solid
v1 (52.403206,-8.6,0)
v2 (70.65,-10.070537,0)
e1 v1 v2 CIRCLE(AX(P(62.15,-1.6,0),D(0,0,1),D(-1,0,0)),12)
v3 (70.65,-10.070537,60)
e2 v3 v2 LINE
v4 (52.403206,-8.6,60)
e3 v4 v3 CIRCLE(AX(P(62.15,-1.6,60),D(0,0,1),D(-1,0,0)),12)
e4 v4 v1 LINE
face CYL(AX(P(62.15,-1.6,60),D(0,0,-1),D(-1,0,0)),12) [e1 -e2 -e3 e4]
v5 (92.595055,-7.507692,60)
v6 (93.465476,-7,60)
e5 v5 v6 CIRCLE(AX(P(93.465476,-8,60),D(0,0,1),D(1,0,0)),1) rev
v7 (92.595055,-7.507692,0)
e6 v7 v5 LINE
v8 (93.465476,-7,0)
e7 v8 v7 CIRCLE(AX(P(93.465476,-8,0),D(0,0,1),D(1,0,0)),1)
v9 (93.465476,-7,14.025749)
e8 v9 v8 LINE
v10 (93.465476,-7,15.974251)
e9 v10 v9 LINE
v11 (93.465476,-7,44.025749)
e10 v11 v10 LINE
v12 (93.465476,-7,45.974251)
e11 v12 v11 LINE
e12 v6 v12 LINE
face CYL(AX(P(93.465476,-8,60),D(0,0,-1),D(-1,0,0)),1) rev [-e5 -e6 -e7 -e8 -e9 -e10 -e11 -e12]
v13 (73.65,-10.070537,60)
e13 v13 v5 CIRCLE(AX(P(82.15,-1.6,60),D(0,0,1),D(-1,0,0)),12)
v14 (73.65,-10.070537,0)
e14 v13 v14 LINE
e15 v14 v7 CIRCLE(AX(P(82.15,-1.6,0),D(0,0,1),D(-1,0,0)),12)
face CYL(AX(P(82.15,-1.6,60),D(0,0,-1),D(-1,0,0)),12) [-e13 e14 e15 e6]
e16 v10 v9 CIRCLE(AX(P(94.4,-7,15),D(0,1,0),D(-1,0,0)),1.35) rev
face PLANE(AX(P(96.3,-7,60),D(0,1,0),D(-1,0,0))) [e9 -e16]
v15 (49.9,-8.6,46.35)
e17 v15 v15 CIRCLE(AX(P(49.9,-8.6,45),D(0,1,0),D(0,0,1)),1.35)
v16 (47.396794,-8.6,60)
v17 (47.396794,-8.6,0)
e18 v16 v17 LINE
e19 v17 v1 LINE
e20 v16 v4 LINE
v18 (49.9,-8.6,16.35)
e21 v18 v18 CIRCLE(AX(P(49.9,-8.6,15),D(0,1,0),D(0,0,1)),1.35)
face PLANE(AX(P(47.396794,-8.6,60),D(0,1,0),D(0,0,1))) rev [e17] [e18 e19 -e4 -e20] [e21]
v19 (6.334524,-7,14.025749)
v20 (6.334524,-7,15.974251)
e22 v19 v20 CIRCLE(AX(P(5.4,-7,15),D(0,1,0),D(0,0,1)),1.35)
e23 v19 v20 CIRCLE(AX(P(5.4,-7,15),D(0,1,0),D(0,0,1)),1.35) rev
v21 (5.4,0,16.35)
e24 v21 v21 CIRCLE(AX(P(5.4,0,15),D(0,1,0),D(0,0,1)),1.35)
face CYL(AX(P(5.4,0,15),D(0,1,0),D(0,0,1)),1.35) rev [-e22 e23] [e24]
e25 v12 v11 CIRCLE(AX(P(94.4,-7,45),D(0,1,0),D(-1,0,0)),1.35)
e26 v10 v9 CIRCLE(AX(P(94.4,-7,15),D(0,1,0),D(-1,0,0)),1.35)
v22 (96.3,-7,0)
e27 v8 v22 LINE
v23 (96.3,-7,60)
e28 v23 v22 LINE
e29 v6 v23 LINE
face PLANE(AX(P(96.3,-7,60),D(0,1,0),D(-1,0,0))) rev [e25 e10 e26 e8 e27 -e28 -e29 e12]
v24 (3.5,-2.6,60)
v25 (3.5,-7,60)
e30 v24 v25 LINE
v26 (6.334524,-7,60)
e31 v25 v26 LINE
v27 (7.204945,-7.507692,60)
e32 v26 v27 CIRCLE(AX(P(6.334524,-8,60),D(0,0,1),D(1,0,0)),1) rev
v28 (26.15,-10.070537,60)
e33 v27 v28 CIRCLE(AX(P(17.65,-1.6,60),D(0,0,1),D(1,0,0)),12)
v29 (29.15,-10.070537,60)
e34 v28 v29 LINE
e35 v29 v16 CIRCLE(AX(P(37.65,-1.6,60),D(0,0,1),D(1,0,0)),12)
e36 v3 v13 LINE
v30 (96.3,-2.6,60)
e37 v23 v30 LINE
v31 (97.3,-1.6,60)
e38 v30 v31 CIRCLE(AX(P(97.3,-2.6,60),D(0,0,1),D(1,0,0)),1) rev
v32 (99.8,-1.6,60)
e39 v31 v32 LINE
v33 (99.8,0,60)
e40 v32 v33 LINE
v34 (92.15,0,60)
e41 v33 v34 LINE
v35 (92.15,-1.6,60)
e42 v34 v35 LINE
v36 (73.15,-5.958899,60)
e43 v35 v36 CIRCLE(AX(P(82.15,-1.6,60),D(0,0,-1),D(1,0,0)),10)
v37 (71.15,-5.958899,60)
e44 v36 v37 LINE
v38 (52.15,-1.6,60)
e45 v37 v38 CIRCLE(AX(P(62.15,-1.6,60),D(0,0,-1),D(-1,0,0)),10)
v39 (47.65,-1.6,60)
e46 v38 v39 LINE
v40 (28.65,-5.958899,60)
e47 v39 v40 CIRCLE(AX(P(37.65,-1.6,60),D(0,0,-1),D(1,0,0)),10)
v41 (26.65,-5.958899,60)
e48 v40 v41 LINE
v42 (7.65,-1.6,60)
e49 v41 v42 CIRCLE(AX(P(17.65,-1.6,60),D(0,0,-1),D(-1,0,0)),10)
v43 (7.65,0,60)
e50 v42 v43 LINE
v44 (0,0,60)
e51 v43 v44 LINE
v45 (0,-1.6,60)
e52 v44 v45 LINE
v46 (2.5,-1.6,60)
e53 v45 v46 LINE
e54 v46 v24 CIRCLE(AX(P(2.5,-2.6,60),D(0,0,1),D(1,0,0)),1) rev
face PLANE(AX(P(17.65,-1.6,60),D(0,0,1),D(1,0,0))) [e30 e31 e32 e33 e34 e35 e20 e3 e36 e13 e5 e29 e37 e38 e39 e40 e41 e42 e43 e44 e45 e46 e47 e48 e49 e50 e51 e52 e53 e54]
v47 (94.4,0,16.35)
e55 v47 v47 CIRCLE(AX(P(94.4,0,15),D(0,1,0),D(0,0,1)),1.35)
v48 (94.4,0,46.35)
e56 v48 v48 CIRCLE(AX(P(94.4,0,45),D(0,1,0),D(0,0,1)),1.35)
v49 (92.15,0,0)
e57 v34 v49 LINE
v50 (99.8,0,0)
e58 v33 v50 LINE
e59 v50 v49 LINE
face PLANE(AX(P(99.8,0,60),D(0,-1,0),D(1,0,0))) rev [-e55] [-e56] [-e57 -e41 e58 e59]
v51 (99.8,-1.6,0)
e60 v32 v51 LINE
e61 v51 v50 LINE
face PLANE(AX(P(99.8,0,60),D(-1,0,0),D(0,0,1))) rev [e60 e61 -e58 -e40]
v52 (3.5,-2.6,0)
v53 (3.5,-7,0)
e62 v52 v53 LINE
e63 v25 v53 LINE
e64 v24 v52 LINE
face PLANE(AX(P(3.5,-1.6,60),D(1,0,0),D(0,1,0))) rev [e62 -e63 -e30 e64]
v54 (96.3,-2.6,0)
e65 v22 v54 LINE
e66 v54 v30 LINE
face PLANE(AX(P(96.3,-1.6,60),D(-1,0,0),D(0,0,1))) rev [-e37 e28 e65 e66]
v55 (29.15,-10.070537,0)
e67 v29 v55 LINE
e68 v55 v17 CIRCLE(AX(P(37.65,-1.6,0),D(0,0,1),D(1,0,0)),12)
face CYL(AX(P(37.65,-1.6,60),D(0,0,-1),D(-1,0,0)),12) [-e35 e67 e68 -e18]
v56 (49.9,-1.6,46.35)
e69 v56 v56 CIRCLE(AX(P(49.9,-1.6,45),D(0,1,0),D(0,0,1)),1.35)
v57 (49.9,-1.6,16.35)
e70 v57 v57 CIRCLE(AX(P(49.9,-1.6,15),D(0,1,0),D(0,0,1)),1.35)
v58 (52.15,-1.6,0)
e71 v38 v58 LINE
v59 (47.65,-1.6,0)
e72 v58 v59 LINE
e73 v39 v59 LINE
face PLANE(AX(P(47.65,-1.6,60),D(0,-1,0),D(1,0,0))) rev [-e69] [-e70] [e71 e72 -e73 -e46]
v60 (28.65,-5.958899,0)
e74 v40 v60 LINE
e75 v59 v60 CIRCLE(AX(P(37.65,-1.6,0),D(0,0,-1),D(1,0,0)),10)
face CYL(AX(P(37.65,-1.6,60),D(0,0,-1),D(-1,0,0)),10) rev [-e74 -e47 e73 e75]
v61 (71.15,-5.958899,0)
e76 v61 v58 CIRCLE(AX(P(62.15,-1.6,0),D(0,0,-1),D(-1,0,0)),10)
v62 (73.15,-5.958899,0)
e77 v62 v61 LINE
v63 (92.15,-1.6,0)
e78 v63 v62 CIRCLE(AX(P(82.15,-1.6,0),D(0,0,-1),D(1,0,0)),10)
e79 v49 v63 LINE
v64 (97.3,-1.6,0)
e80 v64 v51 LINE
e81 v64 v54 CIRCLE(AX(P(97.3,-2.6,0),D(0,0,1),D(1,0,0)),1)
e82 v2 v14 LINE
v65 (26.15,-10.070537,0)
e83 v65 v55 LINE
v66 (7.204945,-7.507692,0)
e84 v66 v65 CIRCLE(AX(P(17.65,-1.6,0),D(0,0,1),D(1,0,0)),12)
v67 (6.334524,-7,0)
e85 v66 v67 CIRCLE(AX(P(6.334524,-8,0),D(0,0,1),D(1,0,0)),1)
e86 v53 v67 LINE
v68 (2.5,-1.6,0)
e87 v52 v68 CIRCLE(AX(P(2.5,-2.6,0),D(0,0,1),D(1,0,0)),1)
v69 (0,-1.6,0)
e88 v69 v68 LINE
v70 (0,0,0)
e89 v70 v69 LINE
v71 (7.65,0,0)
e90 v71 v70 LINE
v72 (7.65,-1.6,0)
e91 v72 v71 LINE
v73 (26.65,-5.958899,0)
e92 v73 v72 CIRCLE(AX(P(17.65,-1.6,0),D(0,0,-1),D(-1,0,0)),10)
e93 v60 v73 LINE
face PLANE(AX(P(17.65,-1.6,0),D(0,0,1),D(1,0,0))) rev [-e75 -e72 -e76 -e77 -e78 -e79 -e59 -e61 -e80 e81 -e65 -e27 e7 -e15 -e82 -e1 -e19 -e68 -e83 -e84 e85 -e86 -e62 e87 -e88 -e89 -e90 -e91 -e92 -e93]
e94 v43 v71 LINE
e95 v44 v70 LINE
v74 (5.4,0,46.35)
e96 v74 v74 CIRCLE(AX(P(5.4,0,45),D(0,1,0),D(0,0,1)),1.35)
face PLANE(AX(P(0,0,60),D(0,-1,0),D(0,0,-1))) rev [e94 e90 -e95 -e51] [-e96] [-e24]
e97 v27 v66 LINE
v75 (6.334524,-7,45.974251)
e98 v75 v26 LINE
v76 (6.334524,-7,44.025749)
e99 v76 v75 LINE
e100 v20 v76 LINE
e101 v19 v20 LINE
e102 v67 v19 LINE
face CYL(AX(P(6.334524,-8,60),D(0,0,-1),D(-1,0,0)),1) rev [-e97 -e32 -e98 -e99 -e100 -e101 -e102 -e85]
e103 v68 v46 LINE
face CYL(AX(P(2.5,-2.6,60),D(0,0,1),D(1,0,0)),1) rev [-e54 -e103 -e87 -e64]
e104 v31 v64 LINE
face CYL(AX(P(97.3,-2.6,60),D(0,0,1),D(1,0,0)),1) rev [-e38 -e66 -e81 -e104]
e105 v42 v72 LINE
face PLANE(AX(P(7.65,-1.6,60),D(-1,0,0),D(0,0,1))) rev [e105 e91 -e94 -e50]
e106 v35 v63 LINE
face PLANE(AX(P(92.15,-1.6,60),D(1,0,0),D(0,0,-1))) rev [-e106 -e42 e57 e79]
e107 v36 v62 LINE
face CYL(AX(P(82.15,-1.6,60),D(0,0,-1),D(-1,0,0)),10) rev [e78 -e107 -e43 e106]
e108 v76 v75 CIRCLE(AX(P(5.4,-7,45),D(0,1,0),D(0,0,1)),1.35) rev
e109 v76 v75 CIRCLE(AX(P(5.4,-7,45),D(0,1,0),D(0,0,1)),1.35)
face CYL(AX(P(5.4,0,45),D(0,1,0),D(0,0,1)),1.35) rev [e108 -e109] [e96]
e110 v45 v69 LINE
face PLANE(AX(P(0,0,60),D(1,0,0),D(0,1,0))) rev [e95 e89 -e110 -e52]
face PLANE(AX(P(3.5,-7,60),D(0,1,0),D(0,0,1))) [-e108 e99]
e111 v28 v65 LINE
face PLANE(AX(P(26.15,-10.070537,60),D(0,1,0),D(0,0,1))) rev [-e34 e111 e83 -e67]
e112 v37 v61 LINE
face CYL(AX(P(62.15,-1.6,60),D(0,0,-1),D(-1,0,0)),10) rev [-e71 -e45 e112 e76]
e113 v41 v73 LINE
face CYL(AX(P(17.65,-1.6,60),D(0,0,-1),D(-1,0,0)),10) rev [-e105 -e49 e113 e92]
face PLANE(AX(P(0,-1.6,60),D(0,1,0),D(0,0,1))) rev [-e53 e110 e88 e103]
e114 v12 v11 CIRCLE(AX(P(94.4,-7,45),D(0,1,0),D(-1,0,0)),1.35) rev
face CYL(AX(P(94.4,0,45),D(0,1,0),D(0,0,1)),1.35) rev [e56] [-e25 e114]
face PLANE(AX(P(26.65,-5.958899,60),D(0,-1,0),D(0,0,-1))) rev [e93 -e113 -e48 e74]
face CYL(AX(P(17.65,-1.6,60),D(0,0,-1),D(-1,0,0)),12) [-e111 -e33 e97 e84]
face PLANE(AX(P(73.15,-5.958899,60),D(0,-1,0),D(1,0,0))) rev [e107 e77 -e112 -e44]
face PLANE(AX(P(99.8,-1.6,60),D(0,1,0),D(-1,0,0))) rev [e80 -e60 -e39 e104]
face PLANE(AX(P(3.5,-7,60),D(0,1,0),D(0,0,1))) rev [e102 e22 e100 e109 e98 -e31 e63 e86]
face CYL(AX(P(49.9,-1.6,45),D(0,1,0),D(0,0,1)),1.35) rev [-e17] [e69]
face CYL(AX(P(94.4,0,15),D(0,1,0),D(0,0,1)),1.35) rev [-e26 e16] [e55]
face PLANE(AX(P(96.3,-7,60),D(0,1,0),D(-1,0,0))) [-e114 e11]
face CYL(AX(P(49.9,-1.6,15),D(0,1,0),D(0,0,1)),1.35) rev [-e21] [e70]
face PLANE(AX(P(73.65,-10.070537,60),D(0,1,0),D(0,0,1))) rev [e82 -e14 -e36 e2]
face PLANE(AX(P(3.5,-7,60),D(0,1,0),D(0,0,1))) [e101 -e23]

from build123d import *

# Parameters (mm, degrees)
BOSS_EXTRUDE1_DEPTH                  = 60
FILLET1_R                            = 1
F_2_7_START                          = -7
F_2_7_2_7_DIAMETER_HOLE1_OUTLINE_R   = 1.35
F_2_7_2_7_DIAMETER_HOLE1_DEPTH       = 7
F_2_7_START_2                        = -8.6
F_2_7_2_7_DIAMETER_HOLE1_2_OUTLINE_R = 1.35
F_2_7_2_7_DIAMETER_HOLE1_2_DEPTH     = 1.6


# Read off the part's stored shape, not the designer's step: Ø2.7 (2.7) Diameter Hole1
with BuildPart() as part:
    # Sketch1 → Boss-Extrude1 (new body)
    with BuildSketch(Plane.XY):
        with BuildLine():
            Line((0, 0), (7.65, 0))
            Line((7.65, 0), (7.65, -1.6))
            ThreePointArc((7.65, -1.6), (15.413932023, -11.346794345), (26.65, -5.958898944))
            Line((26.65, -5.958898944), (28.65, -5.958898944))
            ThreePointArc((28.65, -5.958898944), (39.886067977, -11.346794345), (47.65, -1.6))
            Line((47.65, -1.6), (52.15, -1.6))
            ThreePointArc((52.15, -1.6), (59.913932023, -11.346794345), (71.15, -5.958898944))
            Line((71.15, -5.958898944), (73.15, -5.958898944))
            ThreePointArc((73.15, -5.958898944), (84.386067977, -11.346794345), (92.15, -1.6))
            Line((92.15, -1.6), (92.15, 0))
            Line((92.15, 0), (99.8, 0))
            Line((99.8, 0), (99.8, -1.6))
            Line((99.8, -1.6), (96.3, -1.6))
            Line((96.3, -1.6), (96.3, -7))
            Line((96.3, -7), (92.86634266, -7))
            ThreePointArc((92.86634266, -7), (84.043434268, -13.449679602), (73.65, -10.070537173))
            Line((73.65, -10.070537173), (70.65, -10.070537173))
            ThreePointArc((70.65, -10.070537173), (61.186027008, -13.561218837), (52.403205655, -8.6))
            Line((52.403205655, -8.6), (47.396794345, -8.6))
            ThreePointArc((47.396794345, -8.6), (38.613972992, -13.561218837), (29.15, -10.070537173))
            Line((29.15, -10.070537173), (26.15, -10.070537173))
            ThreePointArc((26.15, -10.070537173), (15.756565732, -13.449679602), (6.93365734, -7))
            Line((6.93365734, -7), (3.5, -7))
            Line((3.5, -7), (3.5, -1.6))
            Line((3.5, -1.6), (0, -1.6))
            Line((0, -1.6), (0, 0))
        make_face()
    extrude(amount=BOSS_EXTRUDE1_DEPTH)

    # Fillet1
    fillet1_edges = [part.edges().sort_by_distance(p)[0] for p in [
        (96.3, -1.6, 30),
        (92.86634266, -7, 30),
        (6.93365734, -7, 30),
        (3.5, -1.6, 30),
    ]]
    fillet(fillet1_edges, radius=FILLET1_R)

    # Ø2.7 (2.7) Diameter Hole1 outline → Ø2.7 (2.7) Diameter Hole1 (cut)
    with BuildSketch(Plane(origin=(0, 0, 0), x_dir=(1, 0, 0), z_dir=(0, 1, 0)).offset(F_2_7_START)):
        with Locations((94.4, -15)):
            Circle(F_2_7_2_7_DIAMETER_HOLE1_OUTLINE_R)
        with Locations((94.4, -45)):
            Circle(F_2_7_2_7_DIAMETER_HOLE1_OUTLINE_R)
        with Locations((49.9, -15)):
            Circle(F_2_7_2_7_DIAMETER_HOLE1_OUTLINE_R)
        with Locations((49.9, -45)):
            Circle(F_2_7_2_7_DIAMETER_HOLE1_OUTLINE_R)
    f_2_7_2_7_diameter_hole1 = extrude(amount=F_2_7_2_7_DIAMETER_HOLE1_DEPTH, mode=Mode.SUBTRACT)

    # 2.7 _2.7_ Diameter Hole1 2 outline → 2.7 _2.7_ Diameter Hole1 2 (cut)
    with BuildSketch(Plane(origin=(0, 0, 0), x_dir=(1, 0, 0), z_dir=(0, 1, 0)).offset(F_2_7_START_2)):
        with Locations((49.9, -15)):
            Circle(F_2_7_2_7_DIAMETER_HOLE1_2_OUTLINE_R)
        with Locations((49.9, -45)):
            Circle(F_2_7_2_7_DIAMETER_HOLE1_2_OUTLINE_R)
    f_2_7_2_7_diameter_hole1_2 = extrude(amount=F_2_7_2_7_DIAMETER_HOLE1_2_DEPTH, mode=Mode.SUBTRACT)

    # Mirror1: Ø2.7 (2.7) Diameter Hole1, 2.7 _2.7_ Diameter Hole1 2 across plane
    add(f_2_7_2_7_diameter_hole1.mirror(Plane.ZY.offset(-49.9)), mode=Mode.SUBTRACT)
    add(f_2_7_2_7_diameter_hole1_2.mirror(Plane.ZY.offset(-49.9)), mode=Mode.SUBTRACT)


solid = part.part
